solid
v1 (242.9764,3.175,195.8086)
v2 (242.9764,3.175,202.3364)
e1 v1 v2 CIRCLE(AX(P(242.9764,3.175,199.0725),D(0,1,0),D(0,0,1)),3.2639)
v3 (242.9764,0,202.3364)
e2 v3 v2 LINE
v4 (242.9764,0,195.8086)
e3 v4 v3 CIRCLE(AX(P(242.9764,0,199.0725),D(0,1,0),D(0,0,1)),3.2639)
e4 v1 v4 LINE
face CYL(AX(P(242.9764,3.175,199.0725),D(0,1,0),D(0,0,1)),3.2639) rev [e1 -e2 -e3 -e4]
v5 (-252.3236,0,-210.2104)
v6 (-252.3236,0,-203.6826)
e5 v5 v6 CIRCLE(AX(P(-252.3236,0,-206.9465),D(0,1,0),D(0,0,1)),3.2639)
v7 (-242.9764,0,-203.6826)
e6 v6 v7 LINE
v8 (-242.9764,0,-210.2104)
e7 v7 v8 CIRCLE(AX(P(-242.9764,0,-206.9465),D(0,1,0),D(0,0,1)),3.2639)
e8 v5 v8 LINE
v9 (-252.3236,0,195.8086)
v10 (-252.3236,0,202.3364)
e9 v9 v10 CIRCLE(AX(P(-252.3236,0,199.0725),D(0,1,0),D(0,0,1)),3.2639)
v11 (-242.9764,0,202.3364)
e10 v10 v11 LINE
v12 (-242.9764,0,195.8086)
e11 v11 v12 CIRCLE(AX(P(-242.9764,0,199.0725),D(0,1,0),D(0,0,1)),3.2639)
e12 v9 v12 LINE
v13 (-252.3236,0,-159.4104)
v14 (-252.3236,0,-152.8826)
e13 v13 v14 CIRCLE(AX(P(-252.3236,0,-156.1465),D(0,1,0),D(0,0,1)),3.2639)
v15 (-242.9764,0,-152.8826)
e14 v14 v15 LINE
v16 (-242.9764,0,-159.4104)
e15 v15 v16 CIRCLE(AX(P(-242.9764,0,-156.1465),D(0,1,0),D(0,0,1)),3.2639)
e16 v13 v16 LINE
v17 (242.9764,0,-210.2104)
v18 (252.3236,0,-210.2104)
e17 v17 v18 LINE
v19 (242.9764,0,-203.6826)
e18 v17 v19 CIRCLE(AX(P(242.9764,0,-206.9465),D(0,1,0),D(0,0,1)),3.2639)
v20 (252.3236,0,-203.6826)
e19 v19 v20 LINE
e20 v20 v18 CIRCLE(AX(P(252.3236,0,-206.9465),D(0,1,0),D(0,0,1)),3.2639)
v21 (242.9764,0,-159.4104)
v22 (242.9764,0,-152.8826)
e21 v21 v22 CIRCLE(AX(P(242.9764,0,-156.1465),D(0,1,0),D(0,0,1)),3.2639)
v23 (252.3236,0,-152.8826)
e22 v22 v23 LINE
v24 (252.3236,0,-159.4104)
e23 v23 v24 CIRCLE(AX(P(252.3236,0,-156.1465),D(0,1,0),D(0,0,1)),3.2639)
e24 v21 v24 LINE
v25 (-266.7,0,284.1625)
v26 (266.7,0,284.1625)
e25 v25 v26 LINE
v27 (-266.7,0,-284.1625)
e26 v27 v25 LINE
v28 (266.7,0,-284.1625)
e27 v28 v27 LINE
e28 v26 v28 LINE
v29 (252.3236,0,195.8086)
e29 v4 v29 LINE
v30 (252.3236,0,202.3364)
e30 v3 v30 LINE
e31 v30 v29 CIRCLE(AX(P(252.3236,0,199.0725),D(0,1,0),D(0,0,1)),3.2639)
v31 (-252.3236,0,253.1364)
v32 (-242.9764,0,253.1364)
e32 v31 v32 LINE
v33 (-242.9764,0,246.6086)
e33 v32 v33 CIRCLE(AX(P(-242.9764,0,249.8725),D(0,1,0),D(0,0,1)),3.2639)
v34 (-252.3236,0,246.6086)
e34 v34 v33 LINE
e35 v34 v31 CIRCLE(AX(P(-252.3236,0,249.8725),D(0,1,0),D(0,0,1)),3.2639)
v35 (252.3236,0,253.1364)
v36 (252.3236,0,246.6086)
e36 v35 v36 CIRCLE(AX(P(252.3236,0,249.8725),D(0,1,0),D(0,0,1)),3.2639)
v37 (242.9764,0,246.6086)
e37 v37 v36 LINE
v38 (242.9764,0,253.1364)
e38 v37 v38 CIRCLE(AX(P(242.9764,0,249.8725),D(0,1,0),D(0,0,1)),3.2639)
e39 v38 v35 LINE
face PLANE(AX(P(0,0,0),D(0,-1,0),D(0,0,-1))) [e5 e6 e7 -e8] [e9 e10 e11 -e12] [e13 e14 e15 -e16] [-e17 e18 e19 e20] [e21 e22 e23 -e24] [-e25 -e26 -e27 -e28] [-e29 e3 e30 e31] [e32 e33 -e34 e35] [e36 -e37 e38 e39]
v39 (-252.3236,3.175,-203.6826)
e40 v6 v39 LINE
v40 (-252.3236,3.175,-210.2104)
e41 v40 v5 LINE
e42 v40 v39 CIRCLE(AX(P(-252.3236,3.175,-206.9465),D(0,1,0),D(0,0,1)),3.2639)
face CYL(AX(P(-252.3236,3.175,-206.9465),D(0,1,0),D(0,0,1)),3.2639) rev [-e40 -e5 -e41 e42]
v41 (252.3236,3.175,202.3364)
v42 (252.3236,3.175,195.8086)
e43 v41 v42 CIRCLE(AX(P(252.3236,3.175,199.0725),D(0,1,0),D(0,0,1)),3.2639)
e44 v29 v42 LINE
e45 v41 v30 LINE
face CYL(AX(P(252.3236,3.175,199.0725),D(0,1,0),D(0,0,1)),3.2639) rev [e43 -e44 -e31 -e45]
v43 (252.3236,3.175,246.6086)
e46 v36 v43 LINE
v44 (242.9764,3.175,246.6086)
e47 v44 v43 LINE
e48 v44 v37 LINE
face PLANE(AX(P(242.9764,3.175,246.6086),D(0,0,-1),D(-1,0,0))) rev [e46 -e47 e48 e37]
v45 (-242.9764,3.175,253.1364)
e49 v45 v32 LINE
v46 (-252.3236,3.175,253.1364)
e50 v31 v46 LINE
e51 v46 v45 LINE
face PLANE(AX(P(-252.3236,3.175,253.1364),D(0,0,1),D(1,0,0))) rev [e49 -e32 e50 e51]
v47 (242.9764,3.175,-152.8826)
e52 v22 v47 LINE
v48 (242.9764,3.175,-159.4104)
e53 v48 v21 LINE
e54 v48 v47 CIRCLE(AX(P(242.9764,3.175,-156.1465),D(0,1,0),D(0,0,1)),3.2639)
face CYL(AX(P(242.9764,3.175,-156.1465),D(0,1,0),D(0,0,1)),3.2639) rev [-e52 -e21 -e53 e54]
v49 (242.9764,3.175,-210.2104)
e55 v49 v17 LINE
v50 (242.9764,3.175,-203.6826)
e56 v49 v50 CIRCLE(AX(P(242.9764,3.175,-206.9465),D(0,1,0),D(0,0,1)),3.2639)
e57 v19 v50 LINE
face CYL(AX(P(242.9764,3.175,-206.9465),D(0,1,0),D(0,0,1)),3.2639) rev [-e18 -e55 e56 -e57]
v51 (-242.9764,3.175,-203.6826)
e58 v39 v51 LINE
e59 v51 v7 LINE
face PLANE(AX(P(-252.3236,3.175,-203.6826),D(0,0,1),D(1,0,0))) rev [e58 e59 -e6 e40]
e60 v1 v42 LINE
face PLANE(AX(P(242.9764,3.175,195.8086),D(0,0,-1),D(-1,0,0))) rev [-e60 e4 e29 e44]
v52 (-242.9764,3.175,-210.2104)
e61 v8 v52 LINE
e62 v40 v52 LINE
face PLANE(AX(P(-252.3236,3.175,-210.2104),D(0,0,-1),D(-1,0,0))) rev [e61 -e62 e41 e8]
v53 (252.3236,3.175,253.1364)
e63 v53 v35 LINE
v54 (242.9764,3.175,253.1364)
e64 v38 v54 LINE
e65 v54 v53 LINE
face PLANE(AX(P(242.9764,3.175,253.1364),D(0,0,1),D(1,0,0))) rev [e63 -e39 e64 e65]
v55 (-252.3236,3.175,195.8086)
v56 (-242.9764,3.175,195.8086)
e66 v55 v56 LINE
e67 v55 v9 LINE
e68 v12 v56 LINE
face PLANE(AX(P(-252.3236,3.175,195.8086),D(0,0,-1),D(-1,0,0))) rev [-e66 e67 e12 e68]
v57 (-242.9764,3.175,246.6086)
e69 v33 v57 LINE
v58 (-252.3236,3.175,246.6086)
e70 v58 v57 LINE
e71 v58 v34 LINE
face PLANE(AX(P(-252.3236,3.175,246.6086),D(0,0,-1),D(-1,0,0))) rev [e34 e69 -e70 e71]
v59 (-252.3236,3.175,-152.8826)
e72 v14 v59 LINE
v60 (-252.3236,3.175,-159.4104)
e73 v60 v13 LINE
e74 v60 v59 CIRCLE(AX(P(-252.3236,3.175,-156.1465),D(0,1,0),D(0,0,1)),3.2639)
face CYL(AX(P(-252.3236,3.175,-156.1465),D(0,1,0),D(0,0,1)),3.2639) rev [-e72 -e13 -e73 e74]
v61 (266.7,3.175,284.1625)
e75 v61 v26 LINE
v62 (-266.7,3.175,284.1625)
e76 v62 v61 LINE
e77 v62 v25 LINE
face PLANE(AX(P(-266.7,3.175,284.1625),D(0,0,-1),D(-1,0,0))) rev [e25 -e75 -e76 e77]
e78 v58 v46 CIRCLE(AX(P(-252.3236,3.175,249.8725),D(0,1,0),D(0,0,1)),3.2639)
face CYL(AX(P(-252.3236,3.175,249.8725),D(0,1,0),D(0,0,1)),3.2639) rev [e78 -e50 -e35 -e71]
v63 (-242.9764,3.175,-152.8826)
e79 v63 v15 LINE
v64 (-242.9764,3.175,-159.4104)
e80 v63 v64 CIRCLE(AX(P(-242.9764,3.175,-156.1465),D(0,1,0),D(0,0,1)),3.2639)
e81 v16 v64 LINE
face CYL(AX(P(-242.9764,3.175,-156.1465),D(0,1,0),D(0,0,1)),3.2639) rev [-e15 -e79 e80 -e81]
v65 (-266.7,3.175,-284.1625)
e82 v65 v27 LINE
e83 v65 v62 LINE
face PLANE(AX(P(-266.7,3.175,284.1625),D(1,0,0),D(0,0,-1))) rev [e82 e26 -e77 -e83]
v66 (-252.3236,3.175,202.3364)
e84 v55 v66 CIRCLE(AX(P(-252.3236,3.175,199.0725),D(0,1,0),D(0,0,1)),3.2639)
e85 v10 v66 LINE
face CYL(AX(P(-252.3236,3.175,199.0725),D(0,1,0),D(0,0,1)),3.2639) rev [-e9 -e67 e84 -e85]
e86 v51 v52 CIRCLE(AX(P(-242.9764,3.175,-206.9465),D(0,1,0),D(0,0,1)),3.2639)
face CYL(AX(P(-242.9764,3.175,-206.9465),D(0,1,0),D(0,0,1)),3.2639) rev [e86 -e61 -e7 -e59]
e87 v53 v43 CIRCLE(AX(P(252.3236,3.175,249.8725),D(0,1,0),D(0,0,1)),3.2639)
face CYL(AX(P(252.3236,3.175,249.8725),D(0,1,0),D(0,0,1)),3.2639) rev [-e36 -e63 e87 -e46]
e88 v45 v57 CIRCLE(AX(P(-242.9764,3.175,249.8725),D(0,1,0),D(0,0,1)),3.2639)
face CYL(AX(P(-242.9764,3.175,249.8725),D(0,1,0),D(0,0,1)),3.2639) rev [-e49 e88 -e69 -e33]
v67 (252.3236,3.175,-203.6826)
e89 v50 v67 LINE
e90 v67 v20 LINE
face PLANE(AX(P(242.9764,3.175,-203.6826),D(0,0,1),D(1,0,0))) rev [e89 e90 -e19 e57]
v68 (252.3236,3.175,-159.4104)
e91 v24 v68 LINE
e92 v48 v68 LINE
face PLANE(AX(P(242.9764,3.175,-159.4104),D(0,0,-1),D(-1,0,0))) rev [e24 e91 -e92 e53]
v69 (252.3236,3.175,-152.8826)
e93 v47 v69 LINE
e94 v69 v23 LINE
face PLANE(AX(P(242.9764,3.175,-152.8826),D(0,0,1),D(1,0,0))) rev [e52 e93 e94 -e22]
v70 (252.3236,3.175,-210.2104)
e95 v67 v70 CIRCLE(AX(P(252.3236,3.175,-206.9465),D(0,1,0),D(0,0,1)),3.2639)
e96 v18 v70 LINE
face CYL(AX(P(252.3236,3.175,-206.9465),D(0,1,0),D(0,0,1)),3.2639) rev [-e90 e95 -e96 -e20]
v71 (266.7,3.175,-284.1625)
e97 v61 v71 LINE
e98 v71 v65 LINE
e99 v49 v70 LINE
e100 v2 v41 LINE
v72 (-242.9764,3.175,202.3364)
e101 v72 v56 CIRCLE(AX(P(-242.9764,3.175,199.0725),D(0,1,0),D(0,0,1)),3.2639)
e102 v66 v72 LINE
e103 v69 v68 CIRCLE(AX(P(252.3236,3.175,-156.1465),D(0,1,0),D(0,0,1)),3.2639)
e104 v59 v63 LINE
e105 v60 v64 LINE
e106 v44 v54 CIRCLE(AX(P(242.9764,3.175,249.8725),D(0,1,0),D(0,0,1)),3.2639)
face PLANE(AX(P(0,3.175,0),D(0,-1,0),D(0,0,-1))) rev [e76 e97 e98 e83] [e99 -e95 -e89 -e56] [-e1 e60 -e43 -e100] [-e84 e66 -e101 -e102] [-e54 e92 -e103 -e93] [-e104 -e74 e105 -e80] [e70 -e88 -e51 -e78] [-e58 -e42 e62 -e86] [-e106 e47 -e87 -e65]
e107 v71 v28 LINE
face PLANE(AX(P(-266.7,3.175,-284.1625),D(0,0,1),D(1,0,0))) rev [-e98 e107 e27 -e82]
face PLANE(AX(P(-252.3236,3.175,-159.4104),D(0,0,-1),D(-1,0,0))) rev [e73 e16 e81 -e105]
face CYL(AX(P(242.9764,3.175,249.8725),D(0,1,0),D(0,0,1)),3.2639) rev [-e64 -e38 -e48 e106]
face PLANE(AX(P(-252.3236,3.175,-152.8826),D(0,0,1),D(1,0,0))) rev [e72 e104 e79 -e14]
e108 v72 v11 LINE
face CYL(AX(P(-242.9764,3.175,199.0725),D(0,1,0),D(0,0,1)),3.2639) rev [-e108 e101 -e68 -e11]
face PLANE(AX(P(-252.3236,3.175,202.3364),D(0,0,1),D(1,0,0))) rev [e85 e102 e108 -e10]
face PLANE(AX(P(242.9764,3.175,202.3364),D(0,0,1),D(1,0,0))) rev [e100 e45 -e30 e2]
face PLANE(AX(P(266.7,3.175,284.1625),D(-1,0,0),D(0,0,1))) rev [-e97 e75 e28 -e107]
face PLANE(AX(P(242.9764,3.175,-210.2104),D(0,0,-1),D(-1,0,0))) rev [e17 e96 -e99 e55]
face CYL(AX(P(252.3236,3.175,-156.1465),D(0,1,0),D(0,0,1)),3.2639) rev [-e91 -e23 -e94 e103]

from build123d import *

# Parameters (mm, degrees)
SKETCH1_W                    = 533.4
SKETCH1_H                    = 568.325
BOSS_EXTRUDE1_DEPTH          = 3.175
F_0_257_DIAMETER_SLOT1_DEPTH = 3.175


# Read off the part's stored shape, not the designer's step: F (0.257) Diameter Slot1
with BuildPart() as part:
    # Sketch1 → Boss-Extrude1 (new body)
    with BuildSketch(Plane(origin=(0, 0, 0), x_dir=(1, 0, 0), z_dir=(0, 1, 0))):
        Rectangle(SKETCH1_W, SKETCH1_H)
    extrude(amount=BOSS_EXTRUDE1_DEPTH)

    # F (0.257) Diameter Slot1 outline → F (0.257) Diameter Slot1 (cut)
    with BuildSketch(Plane(origin=(0, 0, 0), x_dir=(1, 0, 0), z_dir=(0, 1, 0))):
        with BuildLine():
            Line((242.9764, 203.6826), (252.3236, 203.6826))
            ThreePointArc((252.3236, 203.6826), (255.5875, 206.9465), (252.3236, 210.2104))
            Line((252.3236, 210.2104), (242.9764, 210.2104))
            ThreePointArc((242.9764, 210.2104), (239.7125, 206.9465), (242.9764, 203.6826))
        make_face()
        with BuildLine():
            ThreePointArc((-242.9764, 203.6826), (-239.7125, 206.9465), (-242.9764, 210.2104))
            Line((-242.9764, 210.2104), (-252.3236, 210.2104))
            ThreePointArc((-252.3236, 210.2104), (-255.5875, 206.9465), (-252.3236, 203.6826))
            Line((-252.3236, 203.6826), (-242.9764, 203.6826))
        make_face()
        with BuildLine():
            Line((242.9764, 152.8826), (252.3236, 152.8826))
            ThreePointArc((252.3236, 152.8826), (255.5875, 156.1465), (252.3236, 159.4104))
            Line((252.3236, 159.4104), (242.9764, 159.4104))
            ThreePointArc((242.9764, 159.4104), (239.7125, 156.1465), (242.9764, 152.8826))
        make_face()
        with BuildLine():
            ThreePointArc((-242.9764, 152.8826), (-239.7125, 156.1465), (-242.9764, 159.4104))
            Line((-242.9764, 159.4104), (-252.3236, 159.4104))
            ThreePointArc((-252.3236, 159.4104), (-255.5875, 156.1465), (-252.3236, 152.8826))
            Line((-252.3236, 152.8826), (-242.9764, 152.8826))
        make_face()
        with BuildLine():
            Line((242.9764, -202.3364), (252.3236, -202.3364))
            ThreePointArc((252.3236, -202.3364), (255.5875, -199.0725), (252.3236, -195.8086))
            Line((252.3236, -195.8086), (242.9764, -195.8086))
            ThreePointArc((242.9764, -195.8086), (239.7125, -199.0725), (242.9764, -202.3364))
        make_face()
        with BuildLine():
            ThreePointArc((-242.9764, -202.3364), (-239.7125, -199.0725), (-242.9764, -195.8086))
            Line((-242.9764, -195.8086), (-252.3236, -195.8086))
            ThreePointArc((-252.3236, -195.8086), (-255.5875, -199.0725), (-252.3236, -202.3364))
            Line((-252.3236, -202.3364), (-242.9764, -202.3364))
        make_face()
        with BuildLine():
            Line((242.9764, -253.1364), (252.3236, -253.1364))
            ThreePointArc((252.3236, -253.1364), (255.5875, -249.8725), (252.3236, -246.6086))
            Line((252.3236, -246.6086), (242.9764, -246.6086))
            ThreePointArc((242.9764, -246.6086), (239.7125, -249.8725), (242.9764, -253.1364))
        make_face()
        with BuildLine():
            ThreePointArc((-242.9764, -253.1364), (-239.7125, -249.8725), (-242.9764, -246.6086))
            Line((-242.9764, -246.6086), (-252.3236, -246.6086))
            ThreePointArc((-252.3236, -246.6086), (-255.5875, -249.8725), (-252.3236, -253.1364))
            Line((-252.3236, -253.1364), (-242.9764, -253.1364))
        make_face()
    extrude(amount=F_0_257_DIAMETER_SLOT1_DEPTH, mode=Mode.SUBTRACT)


solid = part.part
